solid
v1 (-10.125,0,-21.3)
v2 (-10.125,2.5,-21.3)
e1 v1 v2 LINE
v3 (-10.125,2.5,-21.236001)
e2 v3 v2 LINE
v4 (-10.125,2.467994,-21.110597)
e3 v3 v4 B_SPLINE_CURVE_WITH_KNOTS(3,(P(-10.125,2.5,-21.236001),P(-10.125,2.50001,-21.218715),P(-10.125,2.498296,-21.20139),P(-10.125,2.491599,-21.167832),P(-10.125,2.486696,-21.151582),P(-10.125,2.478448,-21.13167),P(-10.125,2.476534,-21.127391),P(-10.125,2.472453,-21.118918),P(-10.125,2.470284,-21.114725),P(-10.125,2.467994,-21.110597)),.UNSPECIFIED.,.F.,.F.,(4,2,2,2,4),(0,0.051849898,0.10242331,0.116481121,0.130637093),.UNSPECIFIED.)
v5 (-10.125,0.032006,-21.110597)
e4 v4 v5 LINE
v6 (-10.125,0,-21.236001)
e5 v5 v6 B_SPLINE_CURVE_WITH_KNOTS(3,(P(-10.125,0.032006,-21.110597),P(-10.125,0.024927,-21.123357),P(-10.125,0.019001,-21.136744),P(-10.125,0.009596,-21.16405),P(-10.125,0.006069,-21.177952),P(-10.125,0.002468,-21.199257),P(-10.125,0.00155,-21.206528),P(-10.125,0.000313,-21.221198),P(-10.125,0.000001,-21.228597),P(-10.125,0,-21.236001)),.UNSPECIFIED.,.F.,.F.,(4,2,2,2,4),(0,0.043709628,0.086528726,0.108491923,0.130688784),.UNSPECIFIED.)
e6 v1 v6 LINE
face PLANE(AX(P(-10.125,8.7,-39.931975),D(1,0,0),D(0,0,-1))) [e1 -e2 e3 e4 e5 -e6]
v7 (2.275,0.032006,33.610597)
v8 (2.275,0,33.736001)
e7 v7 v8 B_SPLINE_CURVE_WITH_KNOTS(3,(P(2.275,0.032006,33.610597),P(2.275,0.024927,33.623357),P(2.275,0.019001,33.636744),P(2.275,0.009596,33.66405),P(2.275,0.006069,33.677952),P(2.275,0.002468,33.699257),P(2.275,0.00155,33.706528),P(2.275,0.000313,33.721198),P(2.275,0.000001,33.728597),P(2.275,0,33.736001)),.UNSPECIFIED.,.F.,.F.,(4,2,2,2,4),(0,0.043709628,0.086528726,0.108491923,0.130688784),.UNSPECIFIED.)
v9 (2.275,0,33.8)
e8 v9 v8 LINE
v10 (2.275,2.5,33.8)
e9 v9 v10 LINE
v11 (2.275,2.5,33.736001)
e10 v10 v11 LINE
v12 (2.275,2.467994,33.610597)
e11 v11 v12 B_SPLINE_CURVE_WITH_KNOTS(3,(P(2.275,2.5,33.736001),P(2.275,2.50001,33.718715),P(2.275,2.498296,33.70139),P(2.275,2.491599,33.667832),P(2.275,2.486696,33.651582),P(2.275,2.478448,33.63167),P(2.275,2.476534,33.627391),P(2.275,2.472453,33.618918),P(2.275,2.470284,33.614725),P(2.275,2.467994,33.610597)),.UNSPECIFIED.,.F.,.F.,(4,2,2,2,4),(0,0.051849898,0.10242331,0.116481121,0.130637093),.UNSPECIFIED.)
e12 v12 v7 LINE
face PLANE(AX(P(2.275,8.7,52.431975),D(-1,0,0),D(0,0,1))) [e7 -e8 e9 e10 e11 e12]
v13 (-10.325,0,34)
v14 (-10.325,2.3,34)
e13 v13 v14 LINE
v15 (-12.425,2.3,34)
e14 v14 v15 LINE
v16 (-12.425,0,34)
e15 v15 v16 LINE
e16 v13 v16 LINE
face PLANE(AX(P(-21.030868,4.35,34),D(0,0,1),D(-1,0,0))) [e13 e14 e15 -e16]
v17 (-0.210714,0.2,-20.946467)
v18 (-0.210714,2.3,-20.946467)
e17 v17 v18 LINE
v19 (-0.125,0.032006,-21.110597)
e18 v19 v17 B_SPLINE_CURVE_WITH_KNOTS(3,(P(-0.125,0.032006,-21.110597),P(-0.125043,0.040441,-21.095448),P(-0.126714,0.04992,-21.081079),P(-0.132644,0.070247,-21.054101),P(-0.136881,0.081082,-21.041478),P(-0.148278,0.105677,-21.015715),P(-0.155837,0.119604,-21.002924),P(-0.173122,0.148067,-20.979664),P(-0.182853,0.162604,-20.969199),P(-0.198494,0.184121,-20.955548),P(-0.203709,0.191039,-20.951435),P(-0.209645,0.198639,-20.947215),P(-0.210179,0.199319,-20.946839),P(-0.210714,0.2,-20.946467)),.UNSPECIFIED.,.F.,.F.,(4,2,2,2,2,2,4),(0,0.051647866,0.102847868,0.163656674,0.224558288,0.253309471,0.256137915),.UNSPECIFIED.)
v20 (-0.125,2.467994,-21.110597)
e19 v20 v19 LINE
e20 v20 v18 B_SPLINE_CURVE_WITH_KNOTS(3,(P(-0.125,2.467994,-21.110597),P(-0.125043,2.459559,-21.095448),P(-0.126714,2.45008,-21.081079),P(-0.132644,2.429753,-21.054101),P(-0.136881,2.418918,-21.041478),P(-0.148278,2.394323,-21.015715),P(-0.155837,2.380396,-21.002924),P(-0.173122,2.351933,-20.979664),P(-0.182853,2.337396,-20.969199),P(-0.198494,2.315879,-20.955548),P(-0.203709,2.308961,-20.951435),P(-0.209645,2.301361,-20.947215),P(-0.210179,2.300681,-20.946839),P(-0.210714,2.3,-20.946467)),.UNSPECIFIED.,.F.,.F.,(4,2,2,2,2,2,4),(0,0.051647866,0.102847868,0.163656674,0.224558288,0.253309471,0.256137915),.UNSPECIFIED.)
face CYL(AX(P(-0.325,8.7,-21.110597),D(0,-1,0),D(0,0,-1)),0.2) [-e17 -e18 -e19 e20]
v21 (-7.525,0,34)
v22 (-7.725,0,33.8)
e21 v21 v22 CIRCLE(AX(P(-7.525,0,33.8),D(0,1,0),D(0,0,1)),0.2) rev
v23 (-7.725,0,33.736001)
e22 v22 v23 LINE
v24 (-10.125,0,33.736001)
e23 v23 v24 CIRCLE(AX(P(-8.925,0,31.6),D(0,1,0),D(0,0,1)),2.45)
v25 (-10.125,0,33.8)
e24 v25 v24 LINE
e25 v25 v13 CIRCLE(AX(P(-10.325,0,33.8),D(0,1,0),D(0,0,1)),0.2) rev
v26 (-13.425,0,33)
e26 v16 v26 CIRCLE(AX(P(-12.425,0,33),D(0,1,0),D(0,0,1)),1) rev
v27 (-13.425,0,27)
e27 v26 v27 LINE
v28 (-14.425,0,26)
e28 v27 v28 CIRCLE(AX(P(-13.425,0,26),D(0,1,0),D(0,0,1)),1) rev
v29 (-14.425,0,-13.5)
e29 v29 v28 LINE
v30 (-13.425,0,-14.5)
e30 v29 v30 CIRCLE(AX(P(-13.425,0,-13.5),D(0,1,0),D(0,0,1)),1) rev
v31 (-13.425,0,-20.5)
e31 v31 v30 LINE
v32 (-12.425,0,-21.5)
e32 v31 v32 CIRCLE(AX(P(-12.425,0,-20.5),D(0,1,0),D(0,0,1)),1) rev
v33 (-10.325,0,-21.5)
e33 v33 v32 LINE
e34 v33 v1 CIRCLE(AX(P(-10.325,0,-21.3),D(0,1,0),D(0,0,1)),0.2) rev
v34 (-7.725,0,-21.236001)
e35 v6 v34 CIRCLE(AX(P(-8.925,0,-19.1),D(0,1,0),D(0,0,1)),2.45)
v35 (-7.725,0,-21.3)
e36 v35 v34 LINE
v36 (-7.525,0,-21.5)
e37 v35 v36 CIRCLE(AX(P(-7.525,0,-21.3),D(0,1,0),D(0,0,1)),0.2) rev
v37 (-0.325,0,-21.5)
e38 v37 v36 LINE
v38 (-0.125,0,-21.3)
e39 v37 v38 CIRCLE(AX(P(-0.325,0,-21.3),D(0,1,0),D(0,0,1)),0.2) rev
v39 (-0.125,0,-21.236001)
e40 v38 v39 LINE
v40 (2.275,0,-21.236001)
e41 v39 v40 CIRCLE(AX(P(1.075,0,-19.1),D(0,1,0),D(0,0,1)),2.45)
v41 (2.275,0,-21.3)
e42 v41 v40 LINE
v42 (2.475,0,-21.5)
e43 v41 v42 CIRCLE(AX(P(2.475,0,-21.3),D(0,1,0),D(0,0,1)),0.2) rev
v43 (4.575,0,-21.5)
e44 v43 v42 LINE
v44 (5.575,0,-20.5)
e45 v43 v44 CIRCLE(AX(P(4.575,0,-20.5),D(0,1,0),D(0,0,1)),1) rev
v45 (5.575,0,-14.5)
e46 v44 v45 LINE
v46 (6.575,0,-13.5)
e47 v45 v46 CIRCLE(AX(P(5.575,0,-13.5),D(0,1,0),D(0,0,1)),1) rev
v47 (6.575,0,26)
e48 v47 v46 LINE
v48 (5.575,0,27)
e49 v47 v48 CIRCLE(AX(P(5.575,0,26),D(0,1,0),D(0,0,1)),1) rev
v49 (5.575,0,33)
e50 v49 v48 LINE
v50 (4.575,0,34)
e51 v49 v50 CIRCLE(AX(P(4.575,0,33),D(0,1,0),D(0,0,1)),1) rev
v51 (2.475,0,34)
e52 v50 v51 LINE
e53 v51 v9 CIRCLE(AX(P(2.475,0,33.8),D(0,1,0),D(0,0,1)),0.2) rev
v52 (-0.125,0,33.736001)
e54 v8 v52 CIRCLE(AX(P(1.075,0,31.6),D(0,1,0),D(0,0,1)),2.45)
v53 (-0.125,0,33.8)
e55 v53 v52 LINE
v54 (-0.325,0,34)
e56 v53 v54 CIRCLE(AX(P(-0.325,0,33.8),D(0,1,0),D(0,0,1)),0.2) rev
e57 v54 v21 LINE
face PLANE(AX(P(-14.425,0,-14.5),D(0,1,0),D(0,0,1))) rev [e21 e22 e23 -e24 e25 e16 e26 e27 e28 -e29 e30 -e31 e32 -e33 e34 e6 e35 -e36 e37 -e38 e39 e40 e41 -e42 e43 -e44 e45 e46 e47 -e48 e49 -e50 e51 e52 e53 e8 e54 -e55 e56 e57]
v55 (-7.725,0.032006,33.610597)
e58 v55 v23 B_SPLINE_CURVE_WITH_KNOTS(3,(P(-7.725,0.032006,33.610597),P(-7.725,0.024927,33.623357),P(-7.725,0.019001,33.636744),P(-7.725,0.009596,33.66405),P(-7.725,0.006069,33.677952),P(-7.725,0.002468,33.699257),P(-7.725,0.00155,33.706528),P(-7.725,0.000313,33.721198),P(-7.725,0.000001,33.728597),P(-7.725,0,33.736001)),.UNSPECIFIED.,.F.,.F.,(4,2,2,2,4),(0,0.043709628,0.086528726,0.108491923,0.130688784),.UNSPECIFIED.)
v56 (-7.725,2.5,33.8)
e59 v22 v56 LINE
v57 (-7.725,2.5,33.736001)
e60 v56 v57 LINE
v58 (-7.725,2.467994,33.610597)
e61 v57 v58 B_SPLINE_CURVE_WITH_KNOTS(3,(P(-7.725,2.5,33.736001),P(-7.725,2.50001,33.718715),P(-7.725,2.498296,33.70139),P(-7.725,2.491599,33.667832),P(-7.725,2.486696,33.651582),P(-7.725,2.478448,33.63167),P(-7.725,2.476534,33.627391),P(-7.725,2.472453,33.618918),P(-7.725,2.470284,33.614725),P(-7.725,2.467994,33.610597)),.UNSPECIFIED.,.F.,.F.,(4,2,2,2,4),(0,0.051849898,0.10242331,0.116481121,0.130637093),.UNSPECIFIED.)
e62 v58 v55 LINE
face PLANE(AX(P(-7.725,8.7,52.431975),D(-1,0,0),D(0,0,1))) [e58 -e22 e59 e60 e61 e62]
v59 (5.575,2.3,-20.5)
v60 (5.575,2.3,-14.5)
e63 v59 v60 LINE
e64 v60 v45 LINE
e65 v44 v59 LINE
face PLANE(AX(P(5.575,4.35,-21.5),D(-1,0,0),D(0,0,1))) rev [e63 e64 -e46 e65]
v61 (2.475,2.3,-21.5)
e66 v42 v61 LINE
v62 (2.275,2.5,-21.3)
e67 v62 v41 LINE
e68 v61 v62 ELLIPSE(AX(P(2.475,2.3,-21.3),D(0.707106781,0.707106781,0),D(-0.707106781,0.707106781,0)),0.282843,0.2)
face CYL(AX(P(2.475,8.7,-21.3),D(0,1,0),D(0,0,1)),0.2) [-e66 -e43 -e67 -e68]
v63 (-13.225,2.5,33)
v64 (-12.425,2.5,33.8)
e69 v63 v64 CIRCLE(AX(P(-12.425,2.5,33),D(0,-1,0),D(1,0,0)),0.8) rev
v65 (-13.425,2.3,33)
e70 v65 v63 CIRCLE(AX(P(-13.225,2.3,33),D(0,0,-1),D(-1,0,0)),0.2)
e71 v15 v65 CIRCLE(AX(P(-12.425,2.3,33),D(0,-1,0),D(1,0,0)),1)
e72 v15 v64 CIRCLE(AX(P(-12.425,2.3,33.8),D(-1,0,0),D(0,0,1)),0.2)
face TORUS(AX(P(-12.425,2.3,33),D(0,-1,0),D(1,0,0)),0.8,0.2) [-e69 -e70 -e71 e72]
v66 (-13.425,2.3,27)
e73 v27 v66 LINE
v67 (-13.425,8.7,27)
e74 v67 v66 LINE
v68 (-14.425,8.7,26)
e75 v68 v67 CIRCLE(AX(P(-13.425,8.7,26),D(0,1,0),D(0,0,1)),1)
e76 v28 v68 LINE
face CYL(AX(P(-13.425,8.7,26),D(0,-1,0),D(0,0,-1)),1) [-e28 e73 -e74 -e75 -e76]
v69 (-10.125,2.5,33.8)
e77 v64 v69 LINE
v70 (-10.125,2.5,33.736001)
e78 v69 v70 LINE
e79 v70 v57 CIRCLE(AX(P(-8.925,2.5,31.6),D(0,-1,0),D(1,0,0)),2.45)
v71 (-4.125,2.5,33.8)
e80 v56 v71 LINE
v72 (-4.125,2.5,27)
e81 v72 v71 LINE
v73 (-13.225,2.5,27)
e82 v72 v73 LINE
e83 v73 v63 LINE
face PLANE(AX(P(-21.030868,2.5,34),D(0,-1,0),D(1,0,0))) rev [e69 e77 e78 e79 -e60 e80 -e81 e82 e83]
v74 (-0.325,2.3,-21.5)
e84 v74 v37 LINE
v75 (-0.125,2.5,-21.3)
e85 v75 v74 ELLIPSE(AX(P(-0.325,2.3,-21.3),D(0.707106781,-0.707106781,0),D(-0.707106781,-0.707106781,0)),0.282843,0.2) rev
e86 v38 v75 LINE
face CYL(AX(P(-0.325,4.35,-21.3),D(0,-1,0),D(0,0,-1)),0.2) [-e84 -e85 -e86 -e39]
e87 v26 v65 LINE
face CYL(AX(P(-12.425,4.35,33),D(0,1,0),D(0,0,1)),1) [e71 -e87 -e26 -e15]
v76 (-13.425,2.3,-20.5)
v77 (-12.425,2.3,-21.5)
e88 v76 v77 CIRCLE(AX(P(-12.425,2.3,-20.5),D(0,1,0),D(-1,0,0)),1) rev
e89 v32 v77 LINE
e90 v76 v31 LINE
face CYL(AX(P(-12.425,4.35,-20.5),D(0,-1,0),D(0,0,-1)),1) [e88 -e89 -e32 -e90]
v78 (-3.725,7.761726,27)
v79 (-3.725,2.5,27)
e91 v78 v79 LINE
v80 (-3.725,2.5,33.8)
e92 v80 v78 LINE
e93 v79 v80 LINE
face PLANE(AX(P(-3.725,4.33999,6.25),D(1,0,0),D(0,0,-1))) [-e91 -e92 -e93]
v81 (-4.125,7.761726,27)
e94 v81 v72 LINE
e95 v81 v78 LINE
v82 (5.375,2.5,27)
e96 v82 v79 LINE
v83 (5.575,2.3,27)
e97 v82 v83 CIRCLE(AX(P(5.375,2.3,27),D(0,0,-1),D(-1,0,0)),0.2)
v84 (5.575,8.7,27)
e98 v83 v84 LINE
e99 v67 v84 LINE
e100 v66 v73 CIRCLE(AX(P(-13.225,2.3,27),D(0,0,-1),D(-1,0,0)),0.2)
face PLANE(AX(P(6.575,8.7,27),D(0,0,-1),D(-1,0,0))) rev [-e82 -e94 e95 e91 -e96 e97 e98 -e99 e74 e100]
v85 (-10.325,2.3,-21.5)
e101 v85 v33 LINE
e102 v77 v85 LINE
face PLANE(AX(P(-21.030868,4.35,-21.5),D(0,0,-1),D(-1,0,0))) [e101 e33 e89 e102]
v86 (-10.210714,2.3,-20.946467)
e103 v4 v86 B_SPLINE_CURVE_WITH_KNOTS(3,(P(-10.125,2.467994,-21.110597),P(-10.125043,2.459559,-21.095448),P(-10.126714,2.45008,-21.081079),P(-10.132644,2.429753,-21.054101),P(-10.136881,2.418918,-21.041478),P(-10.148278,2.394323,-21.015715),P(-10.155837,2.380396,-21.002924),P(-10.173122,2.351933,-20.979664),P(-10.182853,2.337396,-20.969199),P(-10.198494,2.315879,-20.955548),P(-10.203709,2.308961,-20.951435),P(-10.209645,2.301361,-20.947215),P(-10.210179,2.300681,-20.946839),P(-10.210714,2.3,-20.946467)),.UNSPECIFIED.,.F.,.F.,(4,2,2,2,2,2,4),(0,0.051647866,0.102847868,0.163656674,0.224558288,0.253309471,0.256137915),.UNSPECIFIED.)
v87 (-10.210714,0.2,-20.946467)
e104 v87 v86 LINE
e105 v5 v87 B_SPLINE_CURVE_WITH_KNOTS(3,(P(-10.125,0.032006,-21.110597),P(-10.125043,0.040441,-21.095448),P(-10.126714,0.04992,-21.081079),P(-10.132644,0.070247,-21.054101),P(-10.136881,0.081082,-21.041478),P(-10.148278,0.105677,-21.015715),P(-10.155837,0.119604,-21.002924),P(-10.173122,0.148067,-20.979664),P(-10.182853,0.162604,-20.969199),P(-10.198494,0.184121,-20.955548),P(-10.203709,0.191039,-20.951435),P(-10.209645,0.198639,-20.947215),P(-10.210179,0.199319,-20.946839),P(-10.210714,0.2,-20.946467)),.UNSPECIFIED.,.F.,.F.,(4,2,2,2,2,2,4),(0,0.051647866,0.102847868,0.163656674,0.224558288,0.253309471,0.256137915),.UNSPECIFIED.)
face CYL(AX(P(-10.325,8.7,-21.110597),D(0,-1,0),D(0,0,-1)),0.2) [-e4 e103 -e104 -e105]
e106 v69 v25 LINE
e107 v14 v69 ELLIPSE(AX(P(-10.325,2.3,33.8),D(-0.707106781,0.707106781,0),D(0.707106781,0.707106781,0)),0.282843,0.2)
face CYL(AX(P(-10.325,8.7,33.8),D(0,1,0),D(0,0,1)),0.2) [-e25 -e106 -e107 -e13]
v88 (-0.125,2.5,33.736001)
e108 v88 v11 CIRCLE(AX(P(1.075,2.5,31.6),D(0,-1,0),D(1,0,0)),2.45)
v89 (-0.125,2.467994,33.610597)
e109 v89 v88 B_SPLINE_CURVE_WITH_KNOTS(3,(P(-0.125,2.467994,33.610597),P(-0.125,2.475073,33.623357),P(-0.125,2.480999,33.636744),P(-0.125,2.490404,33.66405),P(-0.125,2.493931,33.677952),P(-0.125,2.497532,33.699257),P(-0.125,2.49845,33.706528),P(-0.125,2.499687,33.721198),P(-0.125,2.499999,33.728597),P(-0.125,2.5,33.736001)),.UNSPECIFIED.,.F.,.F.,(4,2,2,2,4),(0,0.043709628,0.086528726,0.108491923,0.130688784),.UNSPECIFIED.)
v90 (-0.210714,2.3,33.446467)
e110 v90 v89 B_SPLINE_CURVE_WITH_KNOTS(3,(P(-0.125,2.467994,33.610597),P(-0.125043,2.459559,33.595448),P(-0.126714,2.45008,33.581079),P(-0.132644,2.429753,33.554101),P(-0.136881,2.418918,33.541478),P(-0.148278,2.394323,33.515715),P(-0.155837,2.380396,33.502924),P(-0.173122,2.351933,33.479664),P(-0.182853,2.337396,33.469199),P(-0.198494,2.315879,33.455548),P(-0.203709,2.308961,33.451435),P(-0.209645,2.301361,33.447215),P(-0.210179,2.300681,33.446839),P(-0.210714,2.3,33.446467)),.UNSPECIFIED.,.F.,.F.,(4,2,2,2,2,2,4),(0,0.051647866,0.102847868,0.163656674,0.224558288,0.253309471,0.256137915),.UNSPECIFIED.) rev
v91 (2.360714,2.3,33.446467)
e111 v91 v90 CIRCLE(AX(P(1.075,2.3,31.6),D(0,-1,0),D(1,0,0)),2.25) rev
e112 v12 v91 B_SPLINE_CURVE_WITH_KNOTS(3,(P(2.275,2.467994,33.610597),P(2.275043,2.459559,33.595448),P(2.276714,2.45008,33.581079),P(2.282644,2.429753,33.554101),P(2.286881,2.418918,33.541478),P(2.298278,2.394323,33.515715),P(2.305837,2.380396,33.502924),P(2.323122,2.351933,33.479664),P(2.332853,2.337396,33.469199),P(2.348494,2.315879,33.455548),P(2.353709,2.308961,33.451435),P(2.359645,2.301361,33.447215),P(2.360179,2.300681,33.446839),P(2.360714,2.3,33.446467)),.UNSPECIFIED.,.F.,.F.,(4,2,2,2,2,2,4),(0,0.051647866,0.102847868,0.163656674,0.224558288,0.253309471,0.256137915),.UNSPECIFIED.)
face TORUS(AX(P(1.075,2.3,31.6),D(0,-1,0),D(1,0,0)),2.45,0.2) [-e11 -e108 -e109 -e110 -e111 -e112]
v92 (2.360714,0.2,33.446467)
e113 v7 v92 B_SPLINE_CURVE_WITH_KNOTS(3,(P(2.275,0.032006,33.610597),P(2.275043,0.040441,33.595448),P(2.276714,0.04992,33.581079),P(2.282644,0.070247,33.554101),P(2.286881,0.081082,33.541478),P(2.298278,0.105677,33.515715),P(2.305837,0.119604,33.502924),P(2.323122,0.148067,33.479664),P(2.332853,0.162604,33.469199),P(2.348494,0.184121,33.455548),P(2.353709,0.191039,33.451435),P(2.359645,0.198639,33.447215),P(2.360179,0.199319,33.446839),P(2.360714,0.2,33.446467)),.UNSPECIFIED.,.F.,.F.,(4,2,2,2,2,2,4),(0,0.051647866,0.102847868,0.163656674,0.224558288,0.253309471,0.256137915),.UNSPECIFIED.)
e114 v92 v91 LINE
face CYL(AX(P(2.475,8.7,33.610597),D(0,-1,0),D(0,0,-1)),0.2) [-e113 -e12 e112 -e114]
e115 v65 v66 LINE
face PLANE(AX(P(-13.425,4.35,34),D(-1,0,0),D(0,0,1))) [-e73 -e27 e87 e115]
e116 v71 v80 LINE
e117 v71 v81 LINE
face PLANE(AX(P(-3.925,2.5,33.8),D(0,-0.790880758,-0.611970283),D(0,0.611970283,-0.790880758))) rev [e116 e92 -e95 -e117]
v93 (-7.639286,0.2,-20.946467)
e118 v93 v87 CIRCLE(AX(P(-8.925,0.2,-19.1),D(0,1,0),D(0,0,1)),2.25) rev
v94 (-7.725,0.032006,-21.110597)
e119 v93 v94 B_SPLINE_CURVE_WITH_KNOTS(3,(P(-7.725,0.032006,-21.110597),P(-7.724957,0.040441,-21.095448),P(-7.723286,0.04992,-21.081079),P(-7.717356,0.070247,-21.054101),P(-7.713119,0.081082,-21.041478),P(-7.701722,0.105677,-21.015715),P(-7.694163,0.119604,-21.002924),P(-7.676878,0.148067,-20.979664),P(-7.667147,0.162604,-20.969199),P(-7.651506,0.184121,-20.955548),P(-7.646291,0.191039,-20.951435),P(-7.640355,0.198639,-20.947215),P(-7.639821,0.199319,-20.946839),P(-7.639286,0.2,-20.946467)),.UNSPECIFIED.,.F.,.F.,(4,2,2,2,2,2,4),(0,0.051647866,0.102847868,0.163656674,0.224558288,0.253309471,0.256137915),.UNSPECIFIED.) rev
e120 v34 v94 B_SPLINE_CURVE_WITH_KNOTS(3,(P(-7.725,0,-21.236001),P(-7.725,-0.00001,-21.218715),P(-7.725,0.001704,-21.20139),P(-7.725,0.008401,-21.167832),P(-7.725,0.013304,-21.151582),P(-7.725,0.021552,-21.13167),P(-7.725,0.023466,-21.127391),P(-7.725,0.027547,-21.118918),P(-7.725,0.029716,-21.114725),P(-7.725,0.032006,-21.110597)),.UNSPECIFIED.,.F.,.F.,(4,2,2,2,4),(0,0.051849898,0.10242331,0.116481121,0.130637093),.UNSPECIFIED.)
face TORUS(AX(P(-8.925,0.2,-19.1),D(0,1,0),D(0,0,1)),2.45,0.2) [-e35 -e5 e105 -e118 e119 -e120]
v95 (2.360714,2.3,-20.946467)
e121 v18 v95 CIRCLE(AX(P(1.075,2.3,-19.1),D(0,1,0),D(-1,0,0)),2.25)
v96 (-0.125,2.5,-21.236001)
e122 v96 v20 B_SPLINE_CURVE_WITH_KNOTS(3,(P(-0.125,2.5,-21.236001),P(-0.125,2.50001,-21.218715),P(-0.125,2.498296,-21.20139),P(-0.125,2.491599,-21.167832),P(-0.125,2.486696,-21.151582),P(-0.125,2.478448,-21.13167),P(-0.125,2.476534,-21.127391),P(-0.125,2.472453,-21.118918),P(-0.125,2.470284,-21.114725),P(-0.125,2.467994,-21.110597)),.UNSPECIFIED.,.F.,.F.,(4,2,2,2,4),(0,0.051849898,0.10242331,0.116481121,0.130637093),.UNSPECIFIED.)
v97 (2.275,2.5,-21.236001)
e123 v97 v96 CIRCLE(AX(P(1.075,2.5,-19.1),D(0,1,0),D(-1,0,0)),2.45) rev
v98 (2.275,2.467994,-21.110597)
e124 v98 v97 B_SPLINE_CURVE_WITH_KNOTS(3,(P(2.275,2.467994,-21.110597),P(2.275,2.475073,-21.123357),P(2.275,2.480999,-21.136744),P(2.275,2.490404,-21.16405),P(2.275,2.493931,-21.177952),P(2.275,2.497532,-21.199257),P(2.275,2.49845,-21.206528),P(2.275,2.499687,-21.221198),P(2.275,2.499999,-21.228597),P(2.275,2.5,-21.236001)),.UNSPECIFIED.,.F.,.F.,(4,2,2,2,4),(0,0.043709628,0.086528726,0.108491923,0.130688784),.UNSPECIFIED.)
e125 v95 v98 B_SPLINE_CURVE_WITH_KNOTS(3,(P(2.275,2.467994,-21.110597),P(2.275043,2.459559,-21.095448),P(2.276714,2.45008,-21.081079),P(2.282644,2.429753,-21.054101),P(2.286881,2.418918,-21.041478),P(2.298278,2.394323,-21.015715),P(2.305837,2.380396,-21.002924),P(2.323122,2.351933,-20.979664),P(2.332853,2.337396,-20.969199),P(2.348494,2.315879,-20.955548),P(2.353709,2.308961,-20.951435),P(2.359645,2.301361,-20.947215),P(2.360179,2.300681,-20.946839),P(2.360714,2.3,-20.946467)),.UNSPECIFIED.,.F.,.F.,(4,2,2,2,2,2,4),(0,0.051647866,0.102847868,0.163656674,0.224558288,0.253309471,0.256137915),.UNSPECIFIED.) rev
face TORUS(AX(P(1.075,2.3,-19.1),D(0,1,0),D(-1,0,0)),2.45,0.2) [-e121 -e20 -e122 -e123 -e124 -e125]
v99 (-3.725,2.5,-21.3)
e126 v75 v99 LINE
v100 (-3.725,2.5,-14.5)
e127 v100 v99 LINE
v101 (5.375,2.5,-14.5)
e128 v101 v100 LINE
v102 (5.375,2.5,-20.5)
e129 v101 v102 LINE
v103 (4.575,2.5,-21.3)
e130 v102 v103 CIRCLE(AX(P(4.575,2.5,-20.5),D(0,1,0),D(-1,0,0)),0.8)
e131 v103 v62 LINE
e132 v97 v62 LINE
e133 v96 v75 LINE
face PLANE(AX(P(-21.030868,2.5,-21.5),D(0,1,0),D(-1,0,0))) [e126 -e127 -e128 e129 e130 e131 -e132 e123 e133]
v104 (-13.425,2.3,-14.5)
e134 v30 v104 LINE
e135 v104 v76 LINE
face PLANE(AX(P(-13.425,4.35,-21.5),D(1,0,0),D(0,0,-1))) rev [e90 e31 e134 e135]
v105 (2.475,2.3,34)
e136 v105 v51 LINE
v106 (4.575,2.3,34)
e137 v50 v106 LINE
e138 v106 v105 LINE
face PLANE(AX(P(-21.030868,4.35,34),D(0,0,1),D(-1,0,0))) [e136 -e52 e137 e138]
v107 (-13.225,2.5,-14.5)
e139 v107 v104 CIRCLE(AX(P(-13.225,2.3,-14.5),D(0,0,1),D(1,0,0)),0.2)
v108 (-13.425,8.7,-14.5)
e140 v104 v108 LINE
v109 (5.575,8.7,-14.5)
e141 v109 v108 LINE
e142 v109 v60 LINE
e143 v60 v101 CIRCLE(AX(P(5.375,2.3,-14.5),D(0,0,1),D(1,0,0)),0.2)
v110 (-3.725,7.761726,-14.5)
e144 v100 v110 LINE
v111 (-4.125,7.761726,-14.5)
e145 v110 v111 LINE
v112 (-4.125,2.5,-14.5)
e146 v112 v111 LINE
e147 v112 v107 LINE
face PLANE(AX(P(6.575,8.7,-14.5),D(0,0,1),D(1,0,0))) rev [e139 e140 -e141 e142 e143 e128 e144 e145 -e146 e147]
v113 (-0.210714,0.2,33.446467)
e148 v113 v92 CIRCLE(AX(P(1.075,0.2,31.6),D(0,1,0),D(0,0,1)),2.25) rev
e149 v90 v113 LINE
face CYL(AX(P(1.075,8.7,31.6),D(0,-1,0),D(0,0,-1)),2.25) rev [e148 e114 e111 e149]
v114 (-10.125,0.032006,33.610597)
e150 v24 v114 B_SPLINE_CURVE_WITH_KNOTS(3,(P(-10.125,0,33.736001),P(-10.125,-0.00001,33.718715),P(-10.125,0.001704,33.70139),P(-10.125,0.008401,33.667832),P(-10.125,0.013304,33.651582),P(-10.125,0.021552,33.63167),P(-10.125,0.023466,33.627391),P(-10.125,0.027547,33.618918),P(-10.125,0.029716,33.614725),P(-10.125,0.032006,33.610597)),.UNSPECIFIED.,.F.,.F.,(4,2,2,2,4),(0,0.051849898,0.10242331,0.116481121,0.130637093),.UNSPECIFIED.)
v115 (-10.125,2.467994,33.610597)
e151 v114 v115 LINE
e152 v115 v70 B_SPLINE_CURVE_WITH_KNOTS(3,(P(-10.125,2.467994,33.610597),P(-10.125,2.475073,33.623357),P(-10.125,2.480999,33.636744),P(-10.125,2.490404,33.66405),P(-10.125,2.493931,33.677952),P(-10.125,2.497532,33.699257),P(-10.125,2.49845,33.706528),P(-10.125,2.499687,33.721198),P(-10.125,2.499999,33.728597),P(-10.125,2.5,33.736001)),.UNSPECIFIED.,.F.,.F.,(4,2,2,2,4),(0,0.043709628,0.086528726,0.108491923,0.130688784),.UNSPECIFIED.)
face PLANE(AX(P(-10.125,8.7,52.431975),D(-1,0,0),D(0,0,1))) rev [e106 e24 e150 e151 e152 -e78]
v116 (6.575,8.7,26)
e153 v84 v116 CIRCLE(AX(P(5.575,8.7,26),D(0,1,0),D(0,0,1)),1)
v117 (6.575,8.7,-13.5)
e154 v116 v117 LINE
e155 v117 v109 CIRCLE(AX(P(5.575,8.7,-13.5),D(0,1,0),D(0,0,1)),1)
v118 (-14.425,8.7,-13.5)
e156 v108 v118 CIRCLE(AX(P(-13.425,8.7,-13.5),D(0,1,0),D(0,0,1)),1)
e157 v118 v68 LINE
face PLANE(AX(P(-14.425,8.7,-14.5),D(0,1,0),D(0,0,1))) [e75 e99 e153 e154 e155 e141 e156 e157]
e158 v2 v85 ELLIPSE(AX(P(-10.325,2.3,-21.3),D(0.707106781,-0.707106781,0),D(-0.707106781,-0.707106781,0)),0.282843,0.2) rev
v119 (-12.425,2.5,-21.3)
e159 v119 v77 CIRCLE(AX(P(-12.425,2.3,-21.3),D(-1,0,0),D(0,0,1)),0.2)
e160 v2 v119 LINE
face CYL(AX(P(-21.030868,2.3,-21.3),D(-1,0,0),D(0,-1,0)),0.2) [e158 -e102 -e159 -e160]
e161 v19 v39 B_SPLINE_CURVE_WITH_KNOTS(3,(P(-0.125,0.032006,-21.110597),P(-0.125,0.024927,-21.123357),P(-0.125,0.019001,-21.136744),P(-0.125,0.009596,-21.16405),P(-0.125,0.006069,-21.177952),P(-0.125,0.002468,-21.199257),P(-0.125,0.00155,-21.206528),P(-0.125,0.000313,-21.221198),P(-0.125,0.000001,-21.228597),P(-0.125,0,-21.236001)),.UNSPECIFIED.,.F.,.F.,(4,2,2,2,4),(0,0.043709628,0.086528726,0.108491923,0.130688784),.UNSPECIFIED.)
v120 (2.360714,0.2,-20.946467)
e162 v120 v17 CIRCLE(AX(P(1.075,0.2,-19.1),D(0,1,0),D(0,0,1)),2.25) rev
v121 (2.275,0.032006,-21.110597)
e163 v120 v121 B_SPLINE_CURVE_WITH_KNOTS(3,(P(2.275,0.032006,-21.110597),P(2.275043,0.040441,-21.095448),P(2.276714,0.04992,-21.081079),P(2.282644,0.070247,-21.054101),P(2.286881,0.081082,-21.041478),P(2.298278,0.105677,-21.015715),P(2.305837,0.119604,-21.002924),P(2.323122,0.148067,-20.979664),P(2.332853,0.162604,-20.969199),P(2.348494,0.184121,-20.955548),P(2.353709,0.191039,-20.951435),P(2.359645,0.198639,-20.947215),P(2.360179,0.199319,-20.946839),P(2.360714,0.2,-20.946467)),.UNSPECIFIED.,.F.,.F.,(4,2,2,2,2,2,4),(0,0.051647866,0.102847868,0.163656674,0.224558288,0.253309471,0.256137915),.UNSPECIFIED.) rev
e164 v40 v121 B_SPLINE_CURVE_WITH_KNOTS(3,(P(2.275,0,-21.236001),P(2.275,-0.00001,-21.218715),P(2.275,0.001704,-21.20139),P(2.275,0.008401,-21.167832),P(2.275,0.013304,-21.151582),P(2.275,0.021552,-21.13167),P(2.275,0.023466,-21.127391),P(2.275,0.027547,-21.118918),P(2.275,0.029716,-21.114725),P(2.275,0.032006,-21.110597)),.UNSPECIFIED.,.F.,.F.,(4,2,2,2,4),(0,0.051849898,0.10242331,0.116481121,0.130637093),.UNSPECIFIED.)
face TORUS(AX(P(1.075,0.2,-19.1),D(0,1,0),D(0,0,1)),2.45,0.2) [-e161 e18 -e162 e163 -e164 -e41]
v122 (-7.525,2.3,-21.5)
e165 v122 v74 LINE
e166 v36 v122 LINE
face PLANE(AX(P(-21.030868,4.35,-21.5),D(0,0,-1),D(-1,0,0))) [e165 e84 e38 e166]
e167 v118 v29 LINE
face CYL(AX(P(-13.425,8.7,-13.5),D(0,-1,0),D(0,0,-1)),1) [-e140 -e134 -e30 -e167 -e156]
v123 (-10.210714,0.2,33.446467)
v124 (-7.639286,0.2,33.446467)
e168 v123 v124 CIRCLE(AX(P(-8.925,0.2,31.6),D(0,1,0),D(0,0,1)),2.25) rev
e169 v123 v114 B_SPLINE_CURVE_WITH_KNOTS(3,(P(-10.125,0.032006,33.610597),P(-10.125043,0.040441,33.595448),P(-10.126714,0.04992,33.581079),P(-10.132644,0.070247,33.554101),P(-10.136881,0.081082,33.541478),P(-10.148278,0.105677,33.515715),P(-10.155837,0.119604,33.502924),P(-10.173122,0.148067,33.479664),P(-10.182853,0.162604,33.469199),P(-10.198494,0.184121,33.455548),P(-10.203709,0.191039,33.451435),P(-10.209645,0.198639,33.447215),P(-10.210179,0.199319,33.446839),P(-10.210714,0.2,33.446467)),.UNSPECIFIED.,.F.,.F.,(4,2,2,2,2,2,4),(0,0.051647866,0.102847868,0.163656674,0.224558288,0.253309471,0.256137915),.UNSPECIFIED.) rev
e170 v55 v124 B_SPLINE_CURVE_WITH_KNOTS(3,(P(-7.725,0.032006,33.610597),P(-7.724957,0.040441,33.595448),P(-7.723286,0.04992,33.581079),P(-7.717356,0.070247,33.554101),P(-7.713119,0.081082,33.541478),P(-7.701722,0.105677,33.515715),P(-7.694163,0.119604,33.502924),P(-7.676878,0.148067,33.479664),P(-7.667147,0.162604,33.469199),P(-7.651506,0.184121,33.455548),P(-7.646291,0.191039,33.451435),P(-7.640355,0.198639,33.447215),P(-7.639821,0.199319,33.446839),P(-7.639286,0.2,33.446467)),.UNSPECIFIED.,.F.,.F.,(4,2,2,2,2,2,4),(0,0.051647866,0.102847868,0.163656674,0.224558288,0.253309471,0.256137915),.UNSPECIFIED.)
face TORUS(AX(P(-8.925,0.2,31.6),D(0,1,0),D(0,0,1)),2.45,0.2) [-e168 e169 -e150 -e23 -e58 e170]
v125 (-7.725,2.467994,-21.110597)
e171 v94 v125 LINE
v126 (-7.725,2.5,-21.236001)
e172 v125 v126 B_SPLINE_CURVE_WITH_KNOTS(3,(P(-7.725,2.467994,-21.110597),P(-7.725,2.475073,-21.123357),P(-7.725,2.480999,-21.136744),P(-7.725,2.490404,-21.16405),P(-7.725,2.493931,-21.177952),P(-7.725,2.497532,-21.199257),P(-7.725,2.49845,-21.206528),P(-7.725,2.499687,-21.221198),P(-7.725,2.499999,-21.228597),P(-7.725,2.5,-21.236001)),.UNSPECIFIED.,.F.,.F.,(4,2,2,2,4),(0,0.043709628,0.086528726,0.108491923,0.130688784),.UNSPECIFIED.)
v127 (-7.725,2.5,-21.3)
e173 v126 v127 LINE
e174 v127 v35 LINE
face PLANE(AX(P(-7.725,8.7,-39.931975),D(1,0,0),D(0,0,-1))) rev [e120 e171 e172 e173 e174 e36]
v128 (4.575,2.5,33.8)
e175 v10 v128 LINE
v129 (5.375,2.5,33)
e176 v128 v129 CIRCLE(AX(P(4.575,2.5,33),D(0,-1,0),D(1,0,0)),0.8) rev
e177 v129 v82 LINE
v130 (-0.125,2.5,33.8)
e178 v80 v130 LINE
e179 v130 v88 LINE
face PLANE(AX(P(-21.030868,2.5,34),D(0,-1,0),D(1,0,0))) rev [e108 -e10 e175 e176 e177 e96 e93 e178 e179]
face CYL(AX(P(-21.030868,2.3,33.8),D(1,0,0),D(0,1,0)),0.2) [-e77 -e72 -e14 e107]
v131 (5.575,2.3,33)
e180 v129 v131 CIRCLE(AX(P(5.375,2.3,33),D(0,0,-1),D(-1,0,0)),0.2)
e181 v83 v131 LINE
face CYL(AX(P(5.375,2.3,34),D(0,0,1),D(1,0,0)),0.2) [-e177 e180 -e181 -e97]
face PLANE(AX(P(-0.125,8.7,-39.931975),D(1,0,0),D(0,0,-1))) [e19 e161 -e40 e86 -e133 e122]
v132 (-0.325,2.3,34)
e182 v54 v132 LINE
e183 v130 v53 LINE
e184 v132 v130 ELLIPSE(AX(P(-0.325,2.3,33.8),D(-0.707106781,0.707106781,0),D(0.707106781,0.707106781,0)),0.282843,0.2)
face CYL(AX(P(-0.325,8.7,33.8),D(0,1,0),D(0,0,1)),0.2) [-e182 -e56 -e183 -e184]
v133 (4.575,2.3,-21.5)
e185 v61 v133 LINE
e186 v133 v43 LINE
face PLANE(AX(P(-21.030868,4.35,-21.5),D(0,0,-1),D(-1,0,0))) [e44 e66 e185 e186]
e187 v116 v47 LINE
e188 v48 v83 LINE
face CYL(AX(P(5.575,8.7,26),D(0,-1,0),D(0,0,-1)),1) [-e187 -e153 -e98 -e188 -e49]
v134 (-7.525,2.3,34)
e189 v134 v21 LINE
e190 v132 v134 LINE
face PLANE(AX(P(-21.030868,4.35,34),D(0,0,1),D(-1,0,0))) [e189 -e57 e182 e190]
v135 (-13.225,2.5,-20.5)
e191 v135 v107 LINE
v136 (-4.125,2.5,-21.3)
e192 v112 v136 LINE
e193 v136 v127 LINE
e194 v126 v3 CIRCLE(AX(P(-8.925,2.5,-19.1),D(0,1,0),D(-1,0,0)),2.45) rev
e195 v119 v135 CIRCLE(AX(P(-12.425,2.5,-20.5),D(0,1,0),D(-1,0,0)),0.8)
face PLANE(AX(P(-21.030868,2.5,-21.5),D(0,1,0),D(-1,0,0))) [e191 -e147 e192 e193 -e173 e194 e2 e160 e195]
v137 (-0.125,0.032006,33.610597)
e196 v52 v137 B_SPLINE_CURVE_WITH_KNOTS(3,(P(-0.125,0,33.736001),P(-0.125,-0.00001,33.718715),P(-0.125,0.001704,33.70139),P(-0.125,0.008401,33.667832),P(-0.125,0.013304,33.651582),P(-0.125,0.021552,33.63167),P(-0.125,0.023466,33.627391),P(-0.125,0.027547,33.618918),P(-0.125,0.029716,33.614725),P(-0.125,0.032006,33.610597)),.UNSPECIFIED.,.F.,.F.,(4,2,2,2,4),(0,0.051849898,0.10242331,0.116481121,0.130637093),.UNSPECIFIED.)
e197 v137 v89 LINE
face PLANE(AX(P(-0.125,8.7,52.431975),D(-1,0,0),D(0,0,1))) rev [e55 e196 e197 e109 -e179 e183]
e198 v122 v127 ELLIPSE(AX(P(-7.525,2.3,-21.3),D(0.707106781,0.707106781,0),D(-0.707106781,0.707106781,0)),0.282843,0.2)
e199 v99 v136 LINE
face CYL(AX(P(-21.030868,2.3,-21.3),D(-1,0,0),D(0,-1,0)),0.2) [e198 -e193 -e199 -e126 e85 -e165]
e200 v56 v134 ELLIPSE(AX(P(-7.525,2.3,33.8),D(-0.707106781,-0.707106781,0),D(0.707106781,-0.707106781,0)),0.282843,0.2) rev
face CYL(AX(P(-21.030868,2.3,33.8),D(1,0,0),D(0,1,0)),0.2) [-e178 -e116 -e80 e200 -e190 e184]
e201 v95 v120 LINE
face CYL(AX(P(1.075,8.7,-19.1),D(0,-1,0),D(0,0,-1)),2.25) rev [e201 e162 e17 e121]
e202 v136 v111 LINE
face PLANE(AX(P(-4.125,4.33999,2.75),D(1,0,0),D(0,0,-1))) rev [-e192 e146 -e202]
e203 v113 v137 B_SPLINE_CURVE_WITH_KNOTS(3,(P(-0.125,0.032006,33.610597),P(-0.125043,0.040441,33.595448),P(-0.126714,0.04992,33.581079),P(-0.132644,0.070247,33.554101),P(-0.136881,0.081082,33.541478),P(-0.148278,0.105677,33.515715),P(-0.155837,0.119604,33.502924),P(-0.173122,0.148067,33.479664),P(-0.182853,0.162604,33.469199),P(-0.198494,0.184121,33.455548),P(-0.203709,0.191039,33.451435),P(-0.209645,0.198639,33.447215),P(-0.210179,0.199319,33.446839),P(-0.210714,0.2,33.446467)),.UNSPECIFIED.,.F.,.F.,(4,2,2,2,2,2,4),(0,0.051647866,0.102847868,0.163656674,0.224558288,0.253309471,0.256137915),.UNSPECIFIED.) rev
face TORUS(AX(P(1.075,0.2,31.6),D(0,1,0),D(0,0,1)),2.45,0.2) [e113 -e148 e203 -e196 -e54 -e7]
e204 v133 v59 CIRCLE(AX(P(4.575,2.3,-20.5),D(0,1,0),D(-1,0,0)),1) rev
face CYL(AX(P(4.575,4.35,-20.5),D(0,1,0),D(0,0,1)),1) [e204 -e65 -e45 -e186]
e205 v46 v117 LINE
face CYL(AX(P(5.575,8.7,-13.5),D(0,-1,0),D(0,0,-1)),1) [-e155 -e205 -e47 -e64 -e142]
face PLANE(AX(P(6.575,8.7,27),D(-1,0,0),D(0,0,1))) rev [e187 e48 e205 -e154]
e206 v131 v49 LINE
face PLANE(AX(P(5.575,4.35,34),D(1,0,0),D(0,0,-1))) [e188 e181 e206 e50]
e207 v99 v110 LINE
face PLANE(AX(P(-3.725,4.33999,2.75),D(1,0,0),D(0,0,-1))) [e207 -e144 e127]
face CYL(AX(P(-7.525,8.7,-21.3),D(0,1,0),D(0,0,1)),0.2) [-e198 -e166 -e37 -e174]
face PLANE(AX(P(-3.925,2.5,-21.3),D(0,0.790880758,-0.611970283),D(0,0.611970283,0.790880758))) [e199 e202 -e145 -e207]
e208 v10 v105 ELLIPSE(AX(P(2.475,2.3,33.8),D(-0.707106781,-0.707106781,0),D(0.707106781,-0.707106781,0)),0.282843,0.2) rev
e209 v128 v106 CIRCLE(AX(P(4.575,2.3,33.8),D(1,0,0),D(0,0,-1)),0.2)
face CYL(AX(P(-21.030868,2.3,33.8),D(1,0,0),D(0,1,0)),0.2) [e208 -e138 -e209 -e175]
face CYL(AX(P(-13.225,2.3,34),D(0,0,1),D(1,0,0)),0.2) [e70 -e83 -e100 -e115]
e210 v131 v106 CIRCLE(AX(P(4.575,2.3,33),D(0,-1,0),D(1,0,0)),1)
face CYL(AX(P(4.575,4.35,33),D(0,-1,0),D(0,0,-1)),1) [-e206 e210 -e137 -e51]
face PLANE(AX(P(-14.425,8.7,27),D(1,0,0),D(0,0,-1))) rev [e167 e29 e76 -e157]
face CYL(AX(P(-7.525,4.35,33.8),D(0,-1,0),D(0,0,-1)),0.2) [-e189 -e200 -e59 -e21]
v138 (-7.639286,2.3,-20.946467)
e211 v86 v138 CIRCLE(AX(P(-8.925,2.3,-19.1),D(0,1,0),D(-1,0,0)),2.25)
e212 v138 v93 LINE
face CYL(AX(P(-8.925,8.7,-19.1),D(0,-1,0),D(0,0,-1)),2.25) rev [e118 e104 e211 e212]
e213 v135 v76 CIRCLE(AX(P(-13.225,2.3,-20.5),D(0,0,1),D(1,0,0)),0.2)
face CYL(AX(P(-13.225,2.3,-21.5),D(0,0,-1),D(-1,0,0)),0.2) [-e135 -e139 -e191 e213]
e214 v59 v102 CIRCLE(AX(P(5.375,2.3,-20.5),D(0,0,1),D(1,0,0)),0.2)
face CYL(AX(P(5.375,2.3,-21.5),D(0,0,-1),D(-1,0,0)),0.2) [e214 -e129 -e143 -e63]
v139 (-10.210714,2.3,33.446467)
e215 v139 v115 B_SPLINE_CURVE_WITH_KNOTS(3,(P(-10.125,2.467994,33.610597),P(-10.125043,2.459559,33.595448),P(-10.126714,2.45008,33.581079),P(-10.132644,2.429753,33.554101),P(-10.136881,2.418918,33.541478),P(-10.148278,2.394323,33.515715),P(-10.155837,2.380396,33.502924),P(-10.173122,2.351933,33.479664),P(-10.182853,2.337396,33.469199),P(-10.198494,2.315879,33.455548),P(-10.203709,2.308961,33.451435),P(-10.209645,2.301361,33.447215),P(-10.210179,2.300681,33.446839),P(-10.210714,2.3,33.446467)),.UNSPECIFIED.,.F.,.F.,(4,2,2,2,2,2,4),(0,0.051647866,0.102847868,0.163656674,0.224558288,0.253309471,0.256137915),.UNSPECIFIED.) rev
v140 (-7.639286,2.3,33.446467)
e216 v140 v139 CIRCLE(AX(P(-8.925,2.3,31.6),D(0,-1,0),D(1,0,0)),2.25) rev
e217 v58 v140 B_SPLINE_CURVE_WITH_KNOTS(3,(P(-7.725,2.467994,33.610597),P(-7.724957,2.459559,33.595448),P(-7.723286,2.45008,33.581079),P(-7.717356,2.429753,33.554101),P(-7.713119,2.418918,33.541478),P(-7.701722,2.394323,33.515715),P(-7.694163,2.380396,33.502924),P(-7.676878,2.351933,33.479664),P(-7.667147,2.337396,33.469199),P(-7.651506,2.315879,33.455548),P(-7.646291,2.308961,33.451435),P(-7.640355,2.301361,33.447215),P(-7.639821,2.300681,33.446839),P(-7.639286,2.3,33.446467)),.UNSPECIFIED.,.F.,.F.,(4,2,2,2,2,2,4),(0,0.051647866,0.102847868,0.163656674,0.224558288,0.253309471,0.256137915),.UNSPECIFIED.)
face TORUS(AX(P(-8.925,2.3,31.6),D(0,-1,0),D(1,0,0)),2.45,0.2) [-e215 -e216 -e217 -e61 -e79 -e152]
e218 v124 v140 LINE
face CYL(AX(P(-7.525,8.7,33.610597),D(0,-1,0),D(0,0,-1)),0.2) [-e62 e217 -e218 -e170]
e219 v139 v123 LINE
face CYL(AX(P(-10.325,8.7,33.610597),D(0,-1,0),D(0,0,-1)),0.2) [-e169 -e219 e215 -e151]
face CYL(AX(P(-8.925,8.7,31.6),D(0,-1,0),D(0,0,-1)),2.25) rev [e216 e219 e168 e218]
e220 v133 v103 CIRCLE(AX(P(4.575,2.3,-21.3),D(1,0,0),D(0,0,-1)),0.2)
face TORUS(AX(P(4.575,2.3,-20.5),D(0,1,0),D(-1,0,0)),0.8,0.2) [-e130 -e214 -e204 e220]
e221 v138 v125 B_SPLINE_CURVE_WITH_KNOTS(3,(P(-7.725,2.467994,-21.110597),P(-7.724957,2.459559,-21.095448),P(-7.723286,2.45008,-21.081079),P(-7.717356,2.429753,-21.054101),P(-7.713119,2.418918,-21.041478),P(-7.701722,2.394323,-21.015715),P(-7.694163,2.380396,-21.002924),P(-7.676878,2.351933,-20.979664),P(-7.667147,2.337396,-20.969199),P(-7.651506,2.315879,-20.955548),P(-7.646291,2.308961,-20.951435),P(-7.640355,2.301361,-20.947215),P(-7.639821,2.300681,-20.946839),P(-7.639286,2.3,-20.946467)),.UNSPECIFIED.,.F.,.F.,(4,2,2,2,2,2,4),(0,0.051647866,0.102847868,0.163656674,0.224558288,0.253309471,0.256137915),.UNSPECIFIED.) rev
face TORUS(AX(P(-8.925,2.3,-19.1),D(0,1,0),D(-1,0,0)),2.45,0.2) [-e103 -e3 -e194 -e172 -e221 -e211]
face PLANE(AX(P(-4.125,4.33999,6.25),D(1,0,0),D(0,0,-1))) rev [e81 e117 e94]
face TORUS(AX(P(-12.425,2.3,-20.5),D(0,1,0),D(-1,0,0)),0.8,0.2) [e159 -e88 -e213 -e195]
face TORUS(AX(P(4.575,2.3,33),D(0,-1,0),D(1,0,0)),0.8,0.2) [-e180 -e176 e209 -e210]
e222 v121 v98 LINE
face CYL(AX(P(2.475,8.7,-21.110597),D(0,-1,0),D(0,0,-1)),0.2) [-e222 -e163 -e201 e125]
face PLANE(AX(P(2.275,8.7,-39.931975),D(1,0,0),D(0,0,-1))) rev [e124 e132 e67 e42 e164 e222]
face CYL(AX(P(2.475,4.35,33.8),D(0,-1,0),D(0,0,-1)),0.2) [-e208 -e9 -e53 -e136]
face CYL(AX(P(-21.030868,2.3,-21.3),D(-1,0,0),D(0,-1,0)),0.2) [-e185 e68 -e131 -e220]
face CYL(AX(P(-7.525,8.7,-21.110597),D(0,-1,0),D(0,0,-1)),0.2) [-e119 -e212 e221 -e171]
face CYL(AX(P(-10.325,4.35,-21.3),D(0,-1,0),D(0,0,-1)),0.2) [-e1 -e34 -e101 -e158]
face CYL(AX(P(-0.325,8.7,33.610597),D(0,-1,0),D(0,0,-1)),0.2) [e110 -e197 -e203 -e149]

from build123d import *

# Parameters (mm, degrees)
SKETCH1_W           = 21
SKETCH1_H           = 41.5
BOSS_EXTRUDE1_DEPTH = 8.7
FILLET4_R           = 1
SKETCH3_W           = 9.5
SKETCH3_H           = 2.5
BOSS_EXTRUDE2_DEPTH = 7
CUT_EXTRUDE2_DEPTH  = 32.824057331
FILLET5_R           = 1
FILLET6_R           = 0.2
RIB1_REACH          = 32.248
SKETCH9_WALL_W      = 71.09395944
SKETCH9_WALL_H      = 0.4


# Read off the part's stored shape, not the designer's step: Mirror1
with BuildPart() as part:
    # Sketch1 → Boss-Extrude1 (new body)
    with BuildSketch(Plane(origin=(0, 0, 0), x_dir=(1, 0, 0), z_dir=(0, 1, 0))):
        with Locations((-3.925, -6.25)):
            Rectangle(SKETCH1_W, SKETCH1_H)
    extrude(amount=BOSS_EXTRUDE1_DEPTH)

    # Fillet4
    fillet4_edges = [part.edges().sort_by_distance(p)[0] for p in [
        (-14.425, 4.35, -14.5),
        (6.575, 4.35, -14.5),
        (6.575, 4.35, 27),
        (-14.425, 4.35, 27),
    ]]
    fillet(fillet4_edges, radius=FILLET4_R)

    # Sketch3 → Boss-Extrude2 (add)
    with BuildSketch(Plane(origin=(0, 0, -14.5), x_dir=(-1, 0, 0), z_dir=(0, 0, -1))):
        with Locations((-0.825, 1.25)):
            Rectangle(SKETCH3_W, SKETCH3_H)
        with Locations((8.675, 1.25)):
            Rectangle(SKETCH3_W, SKETCH3_H)
    extrude(amount=BOSS_EXTRUDE2_DEPTH)

    # Sketch4 → Cut-Extrude2 (cut, through all)
    with BuildSketch(Plane.XZ):
        with BuildLine():
            Line((-10.125, -21.5), (-7.725, -21.5))
            Line((-7.725, -21.5), (-7.725, -21.003286631))
            ThreePointArc((-7.725, -21.003286631), (-8.925, -16.85), (-10.125, -21.003286631))
            Line((-10.125, -21.003286631), (-10.125, -21.5))
        make_face()
        with BuildLine():
            Line((-0.125, -21.003286631), (-0.125, -21.5))
            Line((-0.125, -21.5), (2.275, -21.5))
            Line((2.275, -21.5), (2.275, -21.003286631))
            ThreePointArc((2.275, -21.003286631), (1.075, -16.85), (-0.125, -21.003286631))
        make_face()
    extrude(amount=-CUT_EXTRUDE2_DEPTH, mode=Mode.SUBTRACT)

    # Fillet5
    fillet5_edges = [part.edges().sort_by_distance(p)[0] for p in [
        (-13.425, 1.25, -21.5),
        (5.575, 1.25, -21.5),
    ]]
    fillet(fillet5_edges, radius=FILLET5_R)

    # Fillet6
    fillet6_edges = [part.edges().sort_by_distance(p)[0] for p in [
        (-11.275, 2.5, -21.5),
        (-10.125, 1.25, -21.5),
        (-7.725, 1.25, -21.5),
        (-8.925, 2.5, -16.85),
        (-7.725, 1.25, -21.003286631),
        (-10.125, 1.25, -21.003286631),
        (-8.925, 0, -16.85),
        (-3.925, 2.5, -21.5),
        (-0.125, 1.25, -21.5),
        (2.275, 1.25, -21.5),
        (1.075, 2.5, -16.85),
        (-0.125, 1.25, -21.003286631),
        (1.075, 0, -16.85),
        (2.275, 1.25, -21.003286631),
        (3.425, 2.5, -21.5),
        (5.575, 2.5, -17.5),
        (-13.425, 2.5, -17.5),
        (-13.132106781, 2.5, -21.207106781),
        (5.282106781, 2.5, -21.207106781),
    ]]
    fillet(fillet6_edges, radius=FILLET6_R)

    # Sketch9 wall → Rib1 (add, up to next)
    with BuildSketch(Plane(origin=(-3.925, 5.130863051, -17.9), x_dir=(0, 0.611970283054, 0.790880757548), z_dir=(0, -0.790880757548, 0.611970283054)), mode=Mode.PRIVATE) as rib1_sk1:
        Rectangle(SKETCH9_WALL_W, SKETCH9_WALL_H)
    rib1_tool1 = extrude(rib1_sk1.sketch, amount=RIB1_REACH, mode=Mode.PRIVATE) - part.part
    add(rib1_tool1.solids().sort_by_distance((-3.925, 5.130863051, -17.9))[0])

    # Mirror1: part across plane


with BuildPart() as part_1:
    add(part.part)
    add(part.part.mirror(Plane.XY.offset(6.25)))


solid = part_1.part
